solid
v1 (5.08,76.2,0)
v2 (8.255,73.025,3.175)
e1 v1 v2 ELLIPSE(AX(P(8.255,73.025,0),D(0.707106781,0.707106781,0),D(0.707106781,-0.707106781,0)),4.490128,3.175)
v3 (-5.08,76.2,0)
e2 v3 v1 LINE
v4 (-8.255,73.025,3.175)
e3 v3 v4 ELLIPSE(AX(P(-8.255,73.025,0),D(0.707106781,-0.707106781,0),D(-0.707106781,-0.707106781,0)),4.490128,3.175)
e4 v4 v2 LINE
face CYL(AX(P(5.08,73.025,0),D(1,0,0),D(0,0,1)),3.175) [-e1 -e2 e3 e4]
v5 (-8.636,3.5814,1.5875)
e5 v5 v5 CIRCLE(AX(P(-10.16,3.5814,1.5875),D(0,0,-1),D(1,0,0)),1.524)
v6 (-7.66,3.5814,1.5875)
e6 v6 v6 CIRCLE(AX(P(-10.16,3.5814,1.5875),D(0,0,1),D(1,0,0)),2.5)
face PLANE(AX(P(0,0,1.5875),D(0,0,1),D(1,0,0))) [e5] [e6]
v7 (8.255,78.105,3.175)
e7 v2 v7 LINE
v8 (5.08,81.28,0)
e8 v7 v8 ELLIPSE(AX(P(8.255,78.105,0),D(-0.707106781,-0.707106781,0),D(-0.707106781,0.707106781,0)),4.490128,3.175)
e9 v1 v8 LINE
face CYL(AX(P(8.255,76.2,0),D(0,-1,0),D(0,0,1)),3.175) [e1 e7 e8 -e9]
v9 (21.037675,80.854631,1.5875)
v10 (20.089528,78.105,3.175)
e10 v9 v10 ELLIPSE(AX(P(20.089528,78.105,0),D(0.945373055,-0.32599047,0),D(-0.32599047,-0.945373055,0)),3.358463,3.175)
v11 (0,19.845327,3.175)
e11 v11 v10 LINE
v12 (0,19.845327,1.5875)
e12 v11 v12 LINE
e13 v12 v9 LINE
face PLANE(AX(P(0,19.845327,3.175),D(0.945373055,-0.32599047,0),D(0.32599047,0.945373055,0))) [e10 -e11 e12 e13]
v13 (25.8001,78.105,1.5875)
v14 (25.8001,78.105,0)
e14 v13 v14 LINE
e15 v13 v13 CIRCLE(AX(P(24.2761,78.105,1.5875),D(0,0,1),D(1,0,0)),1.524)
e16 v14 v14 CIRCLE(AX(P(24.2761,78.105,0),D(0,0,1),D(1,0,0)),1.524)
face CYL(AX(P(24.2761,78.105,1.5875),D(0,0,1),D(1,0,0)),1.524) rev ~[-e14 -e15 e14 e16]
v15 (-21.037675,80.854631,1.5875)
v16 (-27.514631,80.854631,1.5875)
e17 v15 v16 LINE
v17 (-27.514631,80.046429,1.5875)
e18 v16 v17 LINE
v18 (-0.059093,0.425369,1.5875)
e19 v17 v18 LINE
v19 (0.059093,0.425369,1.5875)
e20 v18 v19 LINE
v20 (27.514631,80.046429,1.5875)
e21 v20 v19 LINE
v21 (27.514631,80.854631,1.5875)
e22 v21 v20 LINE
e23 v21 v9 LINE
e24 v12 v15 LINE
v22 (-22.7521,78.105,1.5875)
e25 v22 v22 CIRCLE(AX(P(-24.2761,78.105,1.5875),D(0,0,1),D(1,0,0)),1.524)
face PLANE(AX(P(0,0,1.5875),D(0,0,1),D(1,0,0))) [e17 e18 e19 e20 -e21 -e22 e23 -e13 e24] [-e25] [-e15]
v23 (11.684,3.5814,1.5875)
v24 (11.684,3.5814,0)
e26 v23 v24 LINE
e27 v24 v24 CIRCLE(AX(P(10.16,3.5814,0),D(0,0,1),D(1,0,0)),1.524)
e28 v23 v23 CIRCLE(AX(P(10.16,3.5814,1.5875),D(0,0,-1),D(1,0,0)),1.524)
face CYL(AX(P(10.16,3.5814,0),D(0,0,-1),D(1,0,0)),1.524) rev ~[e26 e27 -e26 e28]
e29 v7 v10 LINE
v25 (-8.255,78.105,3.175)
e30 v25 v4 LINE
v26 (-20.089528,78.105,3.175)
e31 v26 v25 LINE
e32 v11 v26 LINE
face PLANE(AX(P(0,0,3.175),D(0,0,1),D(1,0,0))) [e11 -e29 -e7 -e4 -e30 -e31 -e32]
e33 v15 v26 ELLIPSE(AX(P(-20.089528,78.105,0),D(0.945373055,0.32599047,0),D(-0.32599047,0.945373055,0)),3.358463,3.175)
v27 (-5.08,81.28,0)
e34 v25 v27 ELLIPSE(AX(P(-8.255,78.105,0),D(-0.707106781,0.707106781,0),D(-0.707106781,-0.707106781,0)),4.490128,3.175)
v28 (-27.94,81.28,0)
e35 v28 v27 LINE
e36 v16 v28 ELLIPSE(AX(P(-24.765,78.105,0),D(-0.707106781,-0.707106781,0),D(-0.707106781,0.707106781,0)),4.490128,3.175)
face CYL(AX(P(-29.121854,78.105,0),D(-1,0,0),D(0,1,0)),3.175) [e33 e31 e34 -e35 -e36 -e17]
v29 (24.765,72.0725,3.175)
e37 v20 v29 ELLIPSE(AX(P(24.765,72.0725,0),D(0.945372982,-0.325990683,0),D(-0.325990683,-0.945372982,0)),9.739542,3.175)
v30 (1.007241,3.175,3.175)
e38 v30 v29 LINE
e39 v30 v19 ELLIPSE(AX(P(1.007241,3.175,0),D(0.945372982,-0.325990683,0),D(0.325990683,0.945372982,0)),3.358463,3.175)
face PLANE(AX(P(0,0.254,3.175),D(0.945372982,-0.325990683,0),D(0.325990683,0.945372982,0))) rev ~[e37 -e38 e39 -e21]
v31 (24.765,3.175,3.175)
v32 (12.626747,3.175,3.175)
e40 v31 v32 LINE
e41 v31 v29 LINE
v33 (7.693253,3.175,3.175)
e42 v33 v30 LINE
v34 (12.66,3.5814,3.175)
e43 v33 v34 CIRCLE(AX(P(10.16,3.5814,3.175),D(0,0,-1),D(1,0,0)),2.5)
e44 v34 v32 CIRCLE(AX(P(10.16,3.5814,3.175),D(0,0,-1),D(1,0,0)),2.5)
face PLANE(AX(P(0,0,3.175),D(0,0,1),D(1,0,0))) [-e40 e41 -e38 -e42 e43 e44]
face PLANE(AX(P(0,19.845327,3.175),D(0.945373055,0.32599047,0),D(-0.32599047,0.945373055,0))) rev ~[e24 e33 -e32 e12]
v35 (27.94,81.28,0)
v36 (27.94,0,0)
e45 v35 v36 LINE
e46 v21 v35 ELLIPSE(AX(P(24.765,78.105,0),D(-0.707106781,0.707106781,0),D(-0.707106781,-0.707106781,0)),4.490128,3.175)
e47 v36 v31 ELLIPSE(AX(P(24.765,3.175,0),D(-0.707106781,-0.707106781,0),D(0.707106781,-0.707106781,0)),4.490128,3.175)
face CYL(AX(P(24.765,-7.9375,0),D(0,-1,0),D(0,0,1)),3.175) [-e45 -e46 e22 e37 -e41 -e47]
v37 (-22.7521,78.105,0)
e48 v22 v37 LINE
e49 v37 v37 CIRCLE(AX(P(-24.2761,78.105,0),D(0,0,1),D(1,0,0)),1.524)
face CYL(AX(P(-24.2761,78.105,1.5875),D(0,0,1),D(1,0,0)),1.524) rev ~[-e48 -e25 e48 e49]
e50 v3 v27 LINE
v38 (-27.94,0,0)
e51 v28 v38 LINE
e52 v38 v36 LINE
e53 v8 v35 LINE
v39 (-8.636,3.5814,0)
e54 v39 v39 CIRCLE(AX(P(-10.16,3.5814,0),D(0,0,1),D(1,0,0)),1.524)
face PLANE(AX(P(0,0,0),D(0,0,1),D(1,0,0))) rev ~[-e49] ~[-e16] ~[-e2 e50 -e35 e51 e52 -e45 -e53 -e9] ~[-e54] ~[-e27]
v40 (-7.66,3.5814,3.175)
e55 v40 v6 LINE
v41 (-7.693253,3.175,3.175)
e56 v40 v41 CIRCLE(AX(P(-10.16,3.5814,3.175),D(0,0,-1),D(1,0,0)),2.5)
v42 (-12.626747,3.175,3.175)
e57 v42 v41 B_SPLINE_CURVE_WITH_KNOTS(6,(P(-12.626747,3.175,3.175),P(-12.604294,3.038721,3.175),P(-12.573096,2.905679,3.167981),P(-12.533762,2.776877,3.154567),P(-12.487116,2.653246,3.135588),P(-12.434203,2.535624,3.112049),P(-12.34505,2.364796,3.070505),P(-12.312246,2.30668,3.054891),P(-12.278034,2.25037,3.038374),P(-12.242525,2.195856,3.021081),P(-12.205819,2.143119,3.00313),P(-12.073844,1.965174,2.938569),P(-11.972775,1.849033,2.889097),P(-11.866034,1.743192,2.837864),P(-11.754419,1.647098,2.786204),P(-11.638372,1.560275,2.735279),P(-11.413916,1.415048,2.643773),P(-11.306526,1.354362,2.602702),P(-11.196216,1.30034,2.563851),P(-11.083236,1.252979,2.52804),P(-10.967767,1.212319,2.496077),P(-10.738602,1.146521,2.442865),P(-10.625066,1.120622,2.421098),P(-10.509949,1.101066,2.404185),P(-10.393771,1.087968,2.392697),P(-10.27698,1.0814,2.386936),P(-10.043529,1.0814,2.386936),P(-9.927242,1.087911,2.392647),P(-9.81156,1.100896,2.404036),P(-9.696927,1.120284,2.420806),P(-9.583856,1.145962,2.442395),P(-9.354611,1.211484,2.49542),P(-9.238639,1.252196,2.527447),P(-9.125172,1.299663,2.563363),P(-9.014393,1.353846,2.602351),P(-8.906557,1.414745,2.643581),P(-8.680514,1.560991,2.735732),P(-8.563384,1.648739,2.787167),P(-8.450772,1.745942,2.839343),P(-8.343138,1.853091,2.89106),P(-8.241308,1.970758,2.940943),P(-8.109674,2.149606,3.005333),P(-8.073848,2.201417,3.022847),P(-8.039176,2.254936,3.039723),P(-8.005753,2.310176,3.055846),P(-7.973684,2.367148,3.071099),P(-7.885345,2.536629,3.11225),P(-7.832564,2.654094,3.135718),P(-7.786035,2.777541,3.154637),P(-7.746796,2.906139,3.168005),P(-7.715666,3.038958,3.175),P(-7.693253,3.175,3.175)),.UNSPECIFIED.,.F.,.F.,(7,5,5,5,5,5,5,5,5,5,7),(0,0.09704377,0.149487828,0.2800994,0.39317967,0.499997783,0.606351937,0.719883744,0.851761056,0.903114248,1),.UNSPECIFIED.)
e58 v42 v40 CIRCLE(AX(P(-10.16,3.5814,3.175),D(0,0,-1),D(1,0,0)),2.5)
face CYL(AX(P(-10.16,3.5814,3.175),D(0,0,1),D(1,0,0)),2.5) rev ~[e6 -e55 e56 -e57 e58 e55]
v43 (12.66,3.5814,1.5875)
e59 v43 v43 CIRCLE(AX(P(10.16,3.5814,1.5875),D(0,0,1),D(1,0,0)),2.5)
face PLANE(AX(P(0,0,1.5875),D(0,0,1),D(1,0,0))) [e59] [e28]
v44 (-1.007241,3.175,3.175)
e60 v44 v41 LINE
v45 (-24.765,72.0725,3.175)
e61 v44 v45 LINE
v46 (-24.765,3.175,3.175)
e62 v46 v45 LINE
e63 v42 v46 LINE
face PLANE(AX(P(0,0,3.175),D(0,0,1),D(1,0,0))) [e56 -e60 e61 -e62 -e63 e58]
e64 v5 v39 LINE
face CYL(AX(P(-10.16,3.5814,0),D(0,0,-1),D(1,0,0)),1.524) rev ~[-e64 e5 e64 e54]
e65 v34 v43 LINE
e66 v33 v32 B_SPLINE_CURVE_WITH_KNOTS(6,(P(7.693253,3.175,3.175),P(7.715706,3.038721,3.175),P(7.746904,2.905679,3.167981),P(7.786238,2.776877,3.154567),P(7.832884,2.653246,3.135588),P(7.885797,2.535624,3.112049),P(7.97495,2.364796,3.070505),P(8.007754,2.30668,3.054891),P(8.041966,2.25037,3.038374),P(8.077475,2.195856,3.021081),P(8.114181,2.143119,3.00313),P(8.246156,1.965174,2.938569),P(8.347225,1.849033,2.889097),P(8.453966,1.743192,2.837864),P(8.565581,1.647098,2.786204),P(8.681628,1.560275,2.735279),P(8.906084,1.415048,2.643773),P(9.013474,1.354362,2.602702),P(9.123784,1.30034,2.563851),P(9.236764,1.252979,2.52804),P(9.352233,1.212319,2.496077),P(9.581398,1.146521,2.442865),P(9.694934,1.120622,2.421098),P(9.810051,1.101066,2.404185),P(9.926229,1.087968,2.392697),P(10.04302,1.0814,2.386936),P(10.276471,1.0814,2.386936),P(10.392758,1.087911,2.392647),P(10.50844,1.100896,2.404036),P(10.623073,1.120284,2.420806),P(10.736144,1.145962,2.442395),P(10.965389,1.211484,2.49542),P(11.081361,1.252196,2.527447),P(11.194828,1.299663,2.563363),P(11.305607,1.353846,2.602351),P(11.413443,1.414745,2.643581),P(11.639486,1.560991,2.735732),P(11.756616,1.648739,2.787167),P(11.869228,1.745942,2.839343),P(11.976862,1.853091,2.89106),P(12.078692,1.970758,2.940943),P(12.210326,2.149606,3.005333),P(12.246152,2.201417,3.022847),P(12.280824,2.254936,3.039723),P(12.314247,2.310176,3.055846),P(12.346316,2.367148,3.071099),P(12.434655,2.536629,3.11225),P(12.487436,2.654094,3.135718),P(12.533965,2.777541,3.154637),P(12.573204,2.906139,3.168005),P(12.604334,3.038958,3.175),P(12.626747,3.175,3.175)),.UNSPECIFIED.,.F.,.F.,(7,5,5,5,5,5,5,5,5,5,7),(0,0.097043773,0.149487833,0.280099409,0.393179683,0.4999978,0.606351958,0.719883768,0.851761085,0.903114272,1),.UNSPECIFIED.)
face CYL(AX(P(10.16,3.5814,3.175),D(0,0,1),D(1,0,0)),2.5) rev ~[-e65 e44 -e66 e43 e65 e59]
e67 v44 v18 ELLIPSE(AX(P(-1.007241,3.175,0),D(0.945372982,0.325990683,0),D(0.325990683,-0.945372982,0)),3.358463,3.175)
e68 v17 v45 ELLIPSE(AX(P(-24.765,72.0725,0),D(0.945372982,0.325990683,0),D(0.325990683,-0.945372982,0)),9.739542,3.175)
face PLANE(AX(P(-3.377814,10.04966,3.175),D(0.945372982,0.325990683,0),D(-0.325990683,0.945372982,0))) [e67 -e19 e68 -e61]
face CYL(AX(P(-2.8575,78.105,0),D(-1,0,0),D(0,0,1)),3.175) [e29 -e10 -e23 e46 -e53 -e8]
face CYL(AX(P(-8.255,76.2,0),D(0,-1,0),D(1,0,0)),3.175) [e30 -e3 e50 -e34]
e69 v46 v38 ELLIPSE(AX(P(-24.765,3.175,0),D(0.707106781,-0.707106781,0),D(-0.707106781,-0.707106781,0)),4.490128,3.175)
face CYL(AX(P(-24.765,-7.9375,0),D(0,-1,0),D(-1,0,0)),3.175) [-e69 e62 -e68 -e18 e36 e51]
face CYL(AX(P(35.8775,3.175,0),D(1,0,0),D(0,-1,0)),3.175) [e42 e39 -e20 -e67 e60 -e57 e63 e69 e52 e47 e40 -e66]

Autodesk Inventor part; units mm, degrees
ref_plane "YZ Plane" through (0, 0, 0) normal (1, 0, 0) x (0, 1, 0)
ref_plane "XZ Plane" through (0, 0, 0) normal (0, 1, 0) x (-1, 0, 0)
ref_plane "XY Plane" through (0, 0, 0) normal (0, 0, 1) x (1, 0, 0)
sketch "Sketch1" plane through (0, 0, 0) normal (0, 0, 1) x (1, 0, 0)
  line L0 (-27.94, 0) -> (27.94, 0)
  line L1 (-27.94, 0) -> (-27.94, 76.2)
  line L2 (-27.94, 76.2) -> (-27.94, 81.28)
  line L3 (-27.94, 81.28) -> (27.94, 81.28)
  line L4 (27.94, 81.28) -> (27.94, 0)
  line L5 (-27.94, 76.2) -> (27.94, 76.2)
  line L6 (0, 0) -> (0, 3.5814)
  line L7 (0, 3.5814) -> (-10.16, 3.5814)
  line L8 (-10.16, 3.5814) -> (10.16, 3.5814)
  circle A0 centre (-10.16, 3.5814) radius 1.524
  circle A1 centre (10.16, 3.5814) radius 1.524
  line L9 (0, 76.2) -> (0, 81.28)
  line L10 (0, 76.2) -> (-5.08, 76.2)
  line L11 (-5.08, 76.2) -> (-5.08, 81.28)
  line L12 (0, 76.2) -> (5.08, 76.2)
  line L13 (5.08, 76.2) -> (5.08, 81.28)
  dimension "d0" = 55.88
  dimension "d1" = 76.2
  dimension "d2" = 5.08
  dimension "d3" = 3.5814
  dimension "d4" = 10.16
  dimension "d5" = 20.32
  dimension "d6" = 3.048
  dimension "d7" = 3.048
  dimension "d8" = 5.08
extrude "Extrusion1" add sketch "Sketch1" along normal blind 3.175 contours L1 L5 L4 L0 | L2 L3 L11 L5 | L5 L13 L3 L4
sketch "Sketch2" plane through (0, 0, 3.175) normal (0, 0, 1) x (1, 0, 0)
  line L0 (-27.94, 81.28) -> (-27.94, 0) projected
  line L1 (3.4628, 9.8032) -> (-34.29, 119.2864)
  line L2 (-34.29, 119.2864) -> (-34.29, 0)
  line L3 (0, 0) -> (0, 76.2)
  line L4 (5.08, 76.2) -> (-5.08, 76.2) projected
  line L5 (-3.4628, 9.8032) -> (34.29, 119.2864)
  line L6 (27.94, 0) -> (27.94, 81.28) projected
  line L7 (27.94, 81.28) -> (5.08, 81.28) projected
  line L8 (5.08, 81.28) -> (5.08, 76.2) projected
  line L9 (5.08, 76.2) -> (-5.08, 76.2) projected
  line L10 (-5.08, 76.2) -> (-5.08, 81.28) projected
  line L11 (-5.08, 81.28) -> (-27.94, 81.28) projected
  line L12 (-27.94, 81.28) -> (-27.94, 0) projected
  line L13 (-27.94, 0) -> (27.94, 0) projected
  circle A0 centre (-10.16, 3.5814) radius 1.524 projected
  circle A1 centre (10.16, 3.5814) radius 1.524 projected
  line L14 (0, 0) -> (0, 0.254)
  line L15 (-5.08, 81.28) -> (-27.94, 81.28) projected
  line L16 (0, 0.254) -> (-27.94, 81.28)
  line L17 (0, 0.254) -> (27.94, 81.28)
  point P0 (6.0051, 2.0643)
  point P1 (-6.0051, 2.0643)
  point P2 (21.1843, 81.28)
  point P3 (0, 19.8454)
  point P4 (-21.1843, 81.28)
  dimension "d15" = 0.254
extrude "Extrusion2" cut sketch "Sketch2" against normal blind 1.5875 contours L11 L1 L5 L16 | L5 L3 L16 | L5 L7 L17 L1 | L1 L17 L3 | A0 | A1
fillet "Fillet1" radius 3.175 8 edges at (-13.1322, 81.28, 3.175) (13.1322, 81.28, 3.175) (27.94, 40.64, 3.175) (-27.94, 40.64, 3.175) (-5.08, 78.74, 3.175) (0, 76.2, 3.175) (5.08, 78.74, 3.175) (0, 0, 3.175)
sketch "Sketch3" plane through (0, 0, 1.5875) normal (0, 0, 1) x (1, 0, 0)
  line L0 (0.0591, 0.4254) -> (-0.0591, 0.4254) projected
  line L1 (27.5146, 80.0464) -> (0.0591, 0.4254) projected
  line L2 (27.5146, 80.8546) -> (27.5146, 80.0464) projected
  line L3 (21.0377, 80.8546) -> (27.5146, 80.8546) projected
  line L4 (0, 19.8454) -> (21.0377, 80.8546) projected
  line L5 (-21.0377, 80.8546) -> (0, 19.8454) projected
  line L6 (-27.5146, 80.8546) -> (-21.0377, 80.8546) projected
  line L7 (-27.5146, 80.0464) -> (-27.5146, 80.8546) projected
  line L8 (-0.0591, 0.4254) -> (-27.5146, 80.0464) projected
  circle A0 centre (-24.2761, 78.105) radius 1.524
  line L9 (-27.5146, 80.8546) -> (-27.94, 81.28) projected
  line L10 (-27.5146, 80.8546) -> (-21.0377, 80.8546) projected
  line L11 (-21.0377, 80.8546) -> (-20.0895, 78.105) projected
  line L12 (-20.0895, 78.105) -> (-8.255, 78.105) projected
  line L13 (-8.255, 78.105) -> (-5.08, 81.28) projected
  line L14 (-5.08, 81.28) -> (-27.94, 81.28) projected
  line L15 (-27.94, 81.28) -> (-27.94, 0) projected
  line L16 (5.08, 76.2) -> (-5.08, 76.2) projected
  line L17 (0, 76.2) -> (0, 83.5529)
  circle A1 centre (24.2761, 78.105) radius 1.524
  line L18 (-1.0072, 3.175) -> (-8.6912, 3.175) projected
  line L19 (-1.0072, 3.175) -> (-24.765, 72.0725) projected
  line L20 (-24.765, 3.175) -> (-24.765, 72.0725) projected
  line L21 (-11.6288, 3.175) -> (-24.765, 3.175) projected
  arc A2 (-8.6912, 3.175) -> (-11.6288, 3.175) centre (-10.16, 3.5814) ccw projected
  line L22 (8.6912, 3.175) -> (1.0072, 3.175) projected
  arc A3 (11.6288, 3.175) -> (8.6912, 3.175) centre (10.16, 3.5814) ccw projected
  line L23 (24.765, 3.175) -> (11.6288, 3.175) projected
  line L24 (24.765, 72.0725) -> (24.765, 3.175) projected
  line L25 (24.765, 72.0725) -> (1.0072, 3.175) projected
  point P0 (0, 0)
  point P1 (-24.2761, 80.8546)
  dimension "d16" = 3.048
  dimension "d17" = 3.175
  dimension "d21" = 74.5236
  dimension "d22" = 14.1161
extrude "Extrusion3" cut sketch "Sketch3" against normal blind 25.4 contours A0 | A1
sketch "Sketch4" plane through (0, 0, 3.175) normal (0, 0, 1) x (1, 0, 0)
  line L0 (-1.0072, 3.175) -> (-8.6912, 3.175) projected
  line L1 (-1.0072, 3.175) -> (-24.765, 72.0725) projected
  line L2 (-24.765, 3.175) -> (-24.765, 72.0725) projected
  line L3 (-11.6288, 3.175) -> (-24.765, 3.175) projected
  arc A0 (-8.6912, 3.175) -> (-11.6288, 3.175) centre (-10.16, 3.5814) ccw projected
  line L4 (8.6912, 3.175) -> (1.0072, 3.175) projected
  arc A1 (11.6288, 3.175) -> (8.6912, 3.175) centre (10.16, 3.5814) ccw projected
  line L5 (24.765, 3.175) -> (11.6288, 3.175) projected
  line L6 (24.765, 72.0725) -> (24.765, 3.175) projected
  line L7 (24.765, 72.0725) -> (1.0072, 3.175) projected
  circle A2 centre (-10.16, 3.5814) radius 1.524 projected
  circle A3 centre (-10.16, 3.5814) radius 2.5
  arc A4 (11.6288, 3.175) -> (8.6912, 3.175) centre (10.16, 3.5814) ccw projected
  circle A5 centre (10.16, 3.5814) radius 2.5
  point P0 (0, 0)
  point P1 (12.6267, 3.175)
  point P2 (7.6933, 3.175)
  dimension "d23" = 5
  dimension "d24" = 5
extrude "Extrusion4" cut sketch "Sketch4" against normal blind 1.5875 contours A3 L3 A2 L0 | L0 A0 L3 A3 | A2 A0 | A1 L5 A5 L4 | L4 A5 L5 A1
properties part number "holo - laser battery backing"
